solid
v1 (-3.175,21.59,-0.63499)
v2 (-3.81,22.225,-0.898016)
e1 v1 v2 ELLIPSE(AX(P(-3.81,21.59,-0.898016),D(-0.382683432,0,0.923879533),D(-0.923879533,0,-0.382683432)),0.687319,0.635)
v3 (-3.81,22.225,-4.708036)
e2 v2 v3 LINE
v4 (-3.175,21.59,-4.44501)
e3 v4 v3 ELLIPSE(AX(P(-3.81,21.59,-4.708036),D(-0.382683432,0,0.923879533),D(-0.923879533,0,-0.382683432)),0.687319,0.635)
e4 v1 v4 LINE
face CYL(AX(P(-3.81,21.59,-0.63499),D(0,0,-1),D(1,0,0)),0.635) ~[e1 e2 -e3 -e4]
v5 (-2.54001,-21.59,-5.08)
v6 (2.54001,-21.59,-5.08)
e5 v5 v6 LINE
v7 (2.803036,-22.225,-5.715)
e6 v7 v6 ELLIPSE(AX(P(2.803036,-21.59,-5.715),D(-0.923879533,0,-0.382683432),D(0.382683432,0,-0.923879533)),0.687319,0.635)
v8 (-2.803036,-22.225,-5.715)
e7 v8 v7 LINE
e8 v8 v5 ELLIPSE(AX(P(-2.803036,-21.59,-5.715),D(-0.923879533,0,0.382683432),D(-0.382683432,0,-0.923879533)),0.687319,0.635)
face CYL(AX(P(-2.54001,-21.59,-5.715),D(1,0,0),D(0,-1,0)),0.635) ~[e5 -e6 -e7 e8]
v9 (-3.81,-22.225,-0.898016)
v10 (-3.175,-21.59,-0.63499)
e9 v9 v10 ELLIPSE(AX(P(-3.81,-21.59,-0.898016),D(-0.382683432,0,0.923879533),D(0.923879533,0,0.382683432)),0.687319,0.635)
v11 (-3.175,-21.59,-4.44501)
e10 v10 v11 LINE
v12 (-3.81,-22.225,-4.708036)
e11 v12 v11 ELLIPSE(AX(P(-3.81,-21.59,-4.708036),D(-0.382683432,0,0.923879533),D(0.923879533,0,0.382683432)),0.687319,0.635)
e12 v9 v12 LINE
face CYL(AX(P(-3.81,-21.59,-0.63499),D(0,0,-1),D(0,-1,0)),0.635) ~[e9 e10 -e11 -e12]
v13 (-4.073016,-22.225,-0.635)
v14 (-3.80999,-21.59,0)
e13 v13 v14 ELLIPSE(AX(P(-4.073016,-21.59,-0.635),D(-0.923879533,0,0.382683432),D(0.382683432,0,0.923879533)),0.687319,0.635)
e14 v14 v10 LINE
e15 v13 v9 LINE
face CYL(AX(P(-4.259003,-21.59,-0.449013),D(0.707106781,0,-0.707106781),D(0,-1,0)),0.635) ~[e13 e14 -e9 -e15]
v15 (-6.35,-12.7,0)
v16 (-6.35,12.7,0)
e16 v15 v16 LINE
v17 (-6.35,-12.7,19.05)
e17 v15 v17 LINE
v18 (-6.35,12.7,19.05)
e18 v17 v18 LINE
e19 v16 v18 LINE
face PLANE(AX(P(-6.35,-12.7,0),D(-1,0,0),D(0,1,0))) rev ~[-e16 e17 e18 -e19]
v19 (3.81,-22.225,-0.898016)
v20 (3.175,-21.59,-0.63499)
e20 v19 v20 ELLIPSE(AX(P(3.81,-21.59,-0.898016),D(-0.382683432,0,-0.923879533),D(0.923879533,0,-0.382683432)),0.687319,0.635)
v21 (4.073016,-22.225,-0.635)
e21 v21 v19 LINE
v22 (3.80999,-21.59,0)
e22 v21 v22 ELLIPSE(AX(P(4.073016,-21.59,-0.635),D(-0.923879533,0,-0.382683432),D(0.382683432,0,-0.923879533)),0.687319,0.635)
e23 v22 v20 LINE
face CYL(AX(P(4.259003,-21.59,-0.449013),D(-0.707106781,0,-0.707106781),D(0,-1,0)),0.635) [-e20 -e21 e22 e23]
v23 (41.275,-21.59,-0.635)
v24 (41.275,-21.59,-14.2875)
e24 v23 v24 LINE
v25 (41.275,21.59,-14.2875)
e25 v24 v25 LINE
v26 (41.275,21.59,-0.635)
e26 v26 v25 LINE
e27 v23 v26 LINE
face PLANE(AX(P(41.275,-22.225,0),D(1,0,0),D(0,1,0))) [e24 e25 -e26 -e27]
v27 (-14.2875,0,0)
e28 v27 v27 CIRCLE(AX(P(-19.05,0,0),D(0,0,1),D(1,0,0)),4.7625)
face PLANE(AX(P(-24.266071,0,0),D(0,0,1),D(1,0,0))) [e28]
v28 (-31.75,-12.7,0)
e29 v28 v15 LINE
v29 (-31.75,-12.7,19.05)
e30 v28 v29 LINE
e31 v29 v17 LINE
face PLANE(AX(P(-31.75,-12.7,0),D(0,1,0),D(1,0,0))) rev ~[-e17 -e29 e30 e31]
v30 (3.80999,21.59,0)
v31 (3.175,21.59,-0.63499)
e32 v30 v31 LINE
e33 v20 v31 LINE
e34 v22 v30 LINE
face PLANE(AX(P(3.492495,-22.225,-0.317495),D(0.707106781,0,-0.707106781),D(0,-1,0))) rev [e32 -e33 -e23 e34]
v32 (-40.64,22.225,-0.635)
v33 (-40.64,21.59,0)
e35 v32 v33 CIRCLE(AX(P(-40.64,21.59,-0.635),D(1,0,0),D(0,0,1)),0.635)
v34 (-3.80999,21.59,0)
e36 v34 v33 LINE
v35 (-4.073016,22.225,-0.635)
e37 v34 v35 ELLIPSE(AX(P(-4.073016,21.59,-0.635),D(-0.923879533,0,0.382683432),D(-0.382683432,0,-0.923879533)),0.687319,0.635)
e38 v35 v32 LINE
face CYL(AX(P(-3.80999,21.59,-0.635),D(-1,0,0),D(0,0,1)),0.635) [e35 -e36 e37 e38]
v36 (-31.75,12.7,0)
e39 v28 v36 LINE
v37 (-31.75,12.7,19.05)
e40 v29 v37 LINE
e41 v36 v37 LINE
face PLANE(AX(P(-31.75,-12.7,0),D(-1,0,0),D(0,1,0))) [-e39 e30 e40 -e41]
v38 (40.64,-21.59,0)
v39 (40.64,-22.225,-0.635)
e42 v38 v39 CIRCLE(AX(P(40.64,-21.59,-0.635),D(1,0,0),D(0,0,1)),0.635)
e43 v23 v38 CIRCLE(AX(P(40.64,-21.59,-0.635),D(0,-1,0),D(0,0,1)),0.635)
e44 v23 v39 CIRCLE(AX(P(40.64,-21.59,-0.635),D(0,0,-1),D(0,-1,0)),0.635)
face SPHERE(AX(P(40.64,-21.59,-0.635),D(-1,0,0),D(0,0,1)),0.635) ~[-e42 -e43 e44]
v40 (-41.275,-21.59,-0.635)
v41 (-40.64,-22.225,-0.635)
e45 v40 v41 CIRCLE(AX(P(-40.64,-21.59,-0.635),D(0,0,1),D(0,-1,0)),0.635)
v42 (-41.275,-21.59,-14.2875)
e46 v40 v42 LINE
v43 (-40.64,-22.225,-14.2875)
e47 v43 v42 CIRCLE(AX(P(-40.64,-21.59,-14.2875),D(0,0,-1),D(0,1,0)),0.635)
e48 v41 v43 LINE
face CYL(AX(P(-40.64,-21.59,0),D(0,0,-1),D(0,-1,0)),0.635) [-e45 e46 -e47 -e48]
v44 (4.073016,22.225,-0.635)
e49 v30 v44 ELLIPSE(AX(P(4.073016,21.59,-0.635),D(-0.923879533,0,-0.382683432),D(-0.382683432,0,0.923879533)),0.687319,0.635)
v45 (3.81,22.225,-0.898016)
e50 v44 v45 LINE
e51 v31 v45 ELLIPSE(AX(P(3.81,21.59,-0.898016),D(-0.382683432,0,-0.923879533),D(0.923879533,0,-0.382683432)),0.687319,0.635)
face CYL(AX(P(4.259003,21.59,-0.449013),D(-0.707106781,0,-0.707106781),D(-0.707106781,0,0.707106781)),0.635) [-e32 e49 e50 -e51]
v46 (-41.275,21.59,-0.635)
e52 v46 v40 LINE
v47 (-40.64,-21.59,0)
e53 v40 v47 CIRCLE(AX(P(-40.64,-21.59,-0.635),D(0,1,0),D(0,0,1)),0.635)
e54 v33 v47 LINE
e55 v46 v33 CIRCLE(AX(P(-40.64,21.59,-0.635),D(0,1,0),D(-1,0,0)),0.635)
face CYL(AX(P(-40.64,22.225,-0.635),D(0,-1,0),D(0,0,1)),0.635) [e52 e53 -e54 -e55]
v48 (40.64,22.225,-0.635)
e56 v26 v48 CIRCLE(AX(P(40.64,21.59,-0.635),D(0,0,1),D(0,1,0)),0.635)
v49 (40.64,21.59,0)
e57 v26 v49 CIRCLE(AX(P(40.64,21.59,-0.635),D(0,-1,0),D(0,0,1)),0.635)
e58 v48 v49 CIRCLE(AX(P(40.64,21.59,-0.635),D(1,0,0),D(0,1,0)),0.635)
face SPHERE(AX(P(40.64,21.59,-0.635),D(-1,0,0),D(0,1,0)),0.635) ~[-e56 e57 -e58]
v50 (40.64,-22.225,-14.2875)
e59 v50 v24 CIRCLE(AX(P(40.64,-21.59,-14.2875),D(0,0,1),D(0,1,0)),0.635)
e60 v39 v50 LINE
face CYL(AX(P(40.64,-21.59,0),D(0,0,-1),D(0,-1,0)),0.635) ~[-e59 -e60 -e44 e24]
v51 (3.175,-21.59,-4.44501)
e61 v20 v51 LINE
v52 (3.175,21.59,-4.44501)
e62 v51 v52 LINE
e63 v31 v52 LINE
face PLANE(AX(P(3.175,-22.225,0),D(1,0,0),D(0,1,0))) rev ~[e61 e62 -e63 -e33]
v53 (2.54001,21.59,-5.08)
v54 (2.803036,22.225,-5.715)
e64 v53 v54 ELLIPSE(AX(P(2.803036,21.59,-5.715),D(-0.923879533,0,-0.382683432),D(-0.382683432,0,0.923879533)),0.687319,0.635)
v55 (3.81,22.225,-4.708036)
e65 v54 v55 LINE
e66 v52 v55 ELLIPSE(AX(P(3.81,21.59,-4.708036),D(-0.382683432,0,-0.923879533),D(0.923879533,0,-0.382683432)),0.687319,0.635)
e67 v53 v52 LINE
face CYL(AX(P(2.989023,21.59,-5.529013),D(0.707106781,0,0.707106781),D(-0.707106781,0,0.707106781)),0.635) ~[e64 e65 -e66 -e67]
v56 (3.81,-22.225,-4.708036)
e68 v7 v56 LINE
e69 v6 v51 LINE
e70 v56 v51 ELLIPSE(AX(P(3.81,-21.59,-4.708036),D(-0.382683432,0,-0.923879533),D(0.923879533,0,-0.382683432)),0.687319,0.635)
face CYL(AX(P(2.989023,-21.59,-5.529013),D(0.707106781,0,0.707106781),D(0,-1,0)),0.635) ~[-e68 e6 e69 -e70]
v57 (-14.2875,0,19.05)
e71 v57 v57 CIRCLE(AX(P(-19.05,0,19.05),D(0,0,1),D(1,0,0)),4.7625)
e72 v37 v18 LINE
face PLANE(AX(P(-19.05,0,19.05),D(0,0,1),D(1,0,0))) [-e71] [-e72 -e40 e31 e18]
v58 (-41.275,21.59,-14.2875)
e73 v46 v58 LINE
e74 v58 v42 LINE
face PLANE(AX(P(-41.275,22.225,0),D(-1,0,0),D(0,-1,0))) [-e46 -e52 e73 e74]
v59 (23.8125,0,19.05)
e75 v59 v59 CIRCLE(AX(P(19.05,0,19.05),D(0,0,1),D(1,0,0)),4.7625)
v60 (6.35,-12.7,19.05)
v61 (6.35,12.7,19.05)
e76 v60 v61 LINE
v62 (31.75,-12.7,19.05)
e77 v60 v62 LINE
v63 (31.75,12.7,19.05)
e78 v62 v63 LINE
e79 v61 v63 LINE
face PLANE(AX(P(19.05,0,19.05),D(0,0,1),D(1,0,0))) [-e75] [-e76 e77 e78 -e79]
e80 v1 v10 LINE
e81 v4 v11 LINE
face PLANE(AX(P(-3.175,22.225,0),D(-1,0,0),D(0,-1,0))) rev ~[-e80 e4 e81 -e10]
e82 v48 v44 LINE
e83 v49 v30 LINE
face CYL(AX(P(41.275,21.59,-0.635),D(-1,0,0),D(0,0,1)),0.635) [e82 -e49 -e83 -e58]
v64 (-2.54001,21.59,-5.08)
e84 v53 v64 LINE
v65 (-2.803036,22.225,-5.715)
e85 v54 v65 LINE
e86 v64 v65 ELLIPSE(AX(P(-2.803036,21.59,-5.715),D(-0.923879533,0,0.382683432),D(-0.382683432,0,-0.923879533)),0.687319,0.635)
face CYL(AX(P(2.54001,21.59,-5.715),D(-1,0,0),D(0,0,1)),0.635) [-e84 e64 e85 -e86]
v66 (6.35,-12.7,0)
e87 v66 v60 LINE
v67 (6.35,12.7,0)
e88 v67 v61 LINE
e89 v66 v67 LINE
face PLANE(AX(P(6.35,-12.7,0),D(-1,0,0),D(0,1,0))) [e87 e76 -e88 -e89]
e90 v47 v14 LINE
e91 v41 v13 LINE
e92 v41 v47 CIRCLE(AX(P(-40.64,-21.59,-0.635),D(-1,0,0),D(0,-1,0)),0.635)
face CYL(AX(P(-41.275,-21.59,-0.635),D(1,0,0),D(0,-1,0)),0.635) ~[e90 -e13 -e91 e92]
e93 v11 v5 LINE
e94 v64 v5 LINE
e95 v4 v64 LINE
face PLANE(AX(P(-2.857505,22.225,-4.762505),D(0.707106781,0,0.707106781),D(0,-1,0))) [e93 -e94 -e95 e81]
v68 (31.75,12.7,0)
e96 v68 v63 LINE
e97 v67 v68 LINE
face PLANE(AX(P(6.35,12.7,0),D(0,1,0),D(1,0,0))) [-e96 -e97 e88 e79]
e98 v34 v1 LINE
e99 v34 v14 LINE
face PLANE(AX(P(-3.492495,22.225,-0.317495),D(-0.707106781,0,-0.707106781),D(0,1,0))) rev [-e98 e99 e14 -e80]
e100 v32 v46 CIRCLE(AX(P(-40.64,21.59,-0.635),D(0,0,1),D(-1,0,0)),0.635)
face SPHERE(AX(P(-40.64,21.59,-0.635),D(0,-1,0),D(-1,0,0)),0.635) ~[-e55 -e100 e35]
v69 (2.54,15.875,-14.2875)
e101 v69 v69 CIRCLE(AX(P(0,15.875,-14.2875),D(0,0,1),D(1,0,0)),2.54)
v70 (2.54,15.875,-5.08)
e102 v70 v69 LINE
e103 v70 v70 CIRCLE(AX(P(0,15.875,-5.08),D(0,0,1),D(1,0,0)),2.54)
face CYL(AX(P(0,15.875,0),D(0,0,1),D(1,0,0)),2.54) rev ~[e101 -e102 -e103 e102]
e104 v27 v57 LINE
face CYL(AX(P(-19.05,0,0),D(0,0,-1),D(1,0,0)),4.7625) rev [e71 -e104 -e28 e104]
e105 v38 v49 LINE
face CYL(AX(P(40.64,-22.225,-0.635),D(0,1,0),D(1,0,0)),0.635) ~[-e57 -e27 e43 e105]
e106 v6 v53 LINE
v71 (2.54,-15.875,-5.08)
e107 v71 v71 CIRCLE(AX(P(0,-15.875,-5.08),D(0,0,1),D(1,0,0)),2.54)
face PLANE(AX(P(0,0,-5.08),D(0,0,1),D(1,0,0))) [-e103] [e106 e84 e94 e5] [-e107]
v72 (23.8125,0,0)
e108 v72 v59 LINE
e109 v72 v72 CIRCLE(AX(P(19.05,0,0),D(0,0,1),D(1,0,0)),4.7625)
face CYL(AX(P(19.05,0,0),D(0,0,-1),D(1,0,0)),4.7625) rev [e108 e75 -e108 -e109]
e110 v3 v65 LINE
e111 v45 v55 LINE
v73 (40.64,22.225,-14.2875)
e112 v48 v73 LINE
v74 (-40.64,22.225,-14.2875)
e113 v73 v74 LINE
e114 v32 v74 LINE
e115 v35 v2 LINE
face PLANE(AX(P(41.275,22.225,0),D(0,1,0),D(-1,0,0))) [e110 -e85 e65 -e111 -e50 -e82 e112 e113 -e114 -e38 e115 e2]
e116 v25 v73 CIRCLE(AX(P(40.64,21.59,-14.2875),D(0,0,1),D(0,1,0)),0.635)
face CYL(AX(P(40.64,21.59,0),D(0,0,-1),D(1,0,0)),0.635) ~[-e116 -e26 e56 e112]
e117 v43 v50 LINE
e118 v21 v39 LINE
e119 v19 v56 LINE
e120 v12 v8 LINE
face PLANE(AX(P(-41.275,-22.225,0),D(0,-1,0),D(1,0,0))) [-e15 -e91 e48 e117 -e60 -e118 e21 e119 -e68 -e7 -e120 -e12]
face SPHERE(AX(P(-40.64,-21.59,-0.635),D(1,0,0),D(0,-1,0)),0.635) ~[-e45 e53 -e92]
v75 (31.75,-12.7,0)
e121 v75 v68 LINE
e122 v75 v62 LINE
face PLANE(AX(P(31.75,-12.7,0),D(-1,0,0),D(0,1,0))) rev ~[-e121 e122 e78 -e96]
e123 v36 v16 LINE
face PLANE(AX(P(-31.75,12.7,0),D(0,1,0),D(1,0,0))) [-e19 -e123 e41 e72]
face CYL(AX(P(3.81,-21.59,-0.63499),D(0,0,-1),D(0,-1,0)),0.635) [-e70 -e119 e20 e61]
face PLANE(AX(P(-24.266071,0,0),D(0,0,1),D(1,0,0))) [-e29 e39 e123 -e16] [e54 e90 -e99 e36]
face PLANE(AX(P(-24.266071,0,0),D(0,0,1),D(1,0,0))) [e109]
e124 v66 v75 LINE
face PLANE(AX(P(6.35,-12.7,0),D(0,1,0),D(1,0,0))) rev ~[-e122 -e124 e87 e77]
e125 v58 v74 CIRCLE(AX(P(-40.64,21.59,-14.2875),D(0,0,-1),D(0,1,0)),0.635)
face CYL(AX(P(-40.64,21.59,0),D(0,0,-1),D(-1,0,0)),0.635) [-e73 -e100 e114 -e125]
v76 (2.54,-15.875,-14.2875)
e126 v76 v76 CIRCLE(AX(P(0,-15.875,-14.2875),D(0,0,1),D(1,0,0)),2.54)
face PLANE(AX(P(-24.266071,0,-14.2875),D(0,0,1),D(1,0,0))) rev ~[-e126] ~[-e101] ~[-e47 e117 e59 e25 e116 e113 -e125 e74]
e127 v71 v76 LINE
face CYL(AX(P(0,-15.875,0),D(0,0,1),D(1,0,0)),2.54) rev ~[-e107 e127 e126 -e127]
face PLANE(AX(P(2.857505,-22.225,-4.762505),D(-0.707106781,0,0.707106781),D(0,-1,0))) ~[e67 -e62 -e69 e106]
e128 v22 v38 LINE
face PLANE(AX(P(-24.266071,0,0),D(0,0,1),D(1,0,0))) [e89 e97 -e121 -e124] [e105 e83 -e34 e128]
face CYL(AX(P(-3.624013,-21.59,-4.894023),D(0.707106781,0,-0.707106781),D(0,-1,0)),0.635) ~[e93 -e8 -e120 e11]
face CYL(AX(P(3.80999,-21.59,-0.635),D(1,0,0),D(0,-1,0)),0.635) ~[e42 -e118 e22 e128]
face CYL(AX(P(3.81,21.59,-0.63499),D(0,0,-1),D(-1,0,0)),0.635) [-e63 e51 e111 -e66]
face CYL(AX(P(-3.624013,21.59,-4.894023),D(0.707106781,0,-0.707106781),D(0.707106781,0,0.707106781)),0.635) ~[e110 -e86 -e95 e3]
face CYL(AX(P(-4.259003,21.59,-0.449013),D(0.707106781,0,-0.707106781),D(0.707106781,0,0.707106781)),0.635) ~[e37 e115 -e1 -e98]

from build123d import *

# Parameters (mm, degrees)
F0_W     = 25.4
F0_H     = 25.4
F0_R     = 4.7625
F0_W_2   = 3.175
F0_W_3   = 6.35
F0_R_2   = 2.54
F1_DEPTH = 14.2875
F2_DEPTH = 19.05
F3_DEPTH = 5.08
F4_DEPTH = 14.2875
F5_SIZE  = 0.63499
F6_R     = 0.635


# Not quite as in the source:
# - a fillet or chamfer is up to 0.001 mm smaller than in the source, because OpenCascade refuses the exact size
# - a feature names something its author has since deleted; it is built from what else it names


with BuildPart() as f1:
    # F0 (on Top) → F1 (new body)
    with BuildSketch(Plane.XY):
        Polygon((-6.35, 12.7), (-3.175, 12.7), (-3.175, 22.225), (-41.275, 22.225), (-41.275, -22.225), (-3.175, -22.225), (-3.175, -12.7), (-6.35, -12.7), (-31.75, -12.7), (-31.75, 12.7), align=None)
        with Locations((-19.05, 0)):
            Rectangle(F0_W, F0_H)
        with Locations((-19.05, 0)):
            Circle(F0_R, mode=Mode.SUBTRACT)
        with Locations((-4.7625, 0)):
            Rectangle(F0_W_2, F0_H)
        Rectangle(F0_W_3, F0_H)
        Polygon((3.175, 12.7), (3.175, 22.225), (2.54, 22.225), (-2.54, 22.225), (-3.175, 22.225), (-3.175, 12.7), align=None)
        with Locations((0, 15.875)):
            Circle(F0_R_2, mode=Mode.SUBTRACT)
        Polygon((2.54, -22.225), (3.175, -22.225), (3.175, -12.7), (-3.175, -12.7), (-3.175, -22.225), (-2.54, -22.225), align=None)
        with Locations((0, -15.875)):
            Circle(F0_R_2, mode=Mode.SUBTRACT)
        Polygon((41.275, -22.225), (41.275, 22.225), (3.175, 22.225), (3.175, 12.7), (6.35, 12.7), (31.75, 12.7), (31.75, -12.7), (6.35, -12.7), (3.175, -12.7), (3.175, -22.225), align=None)
        with Locations((4.7625, 0)):
            Rectangle(F0_W_2, F0_H)
        with Locations((19.05, 0)):
            Rectangle(F0_W, F0_H)
        with Locations((19.05, 0)):
            Circle(F0_R, mode=Mode.SUBTRACT)
        with Locations((19.05, 0)):
            Circle(F0_R)
        with Locations((-19.05, 0)):
            Circle(F0_R)
    extrude(amount=-F1_DEPTH)

    # F0 (on Top) → F2 (join)
    with BuildSketch(Plane.XY):
        with Locations((-19.05, 0)):
            Rectangle(F0_W, F0_H)
        with Locations((-19.05, 0)):
            Circle(F0_R, mode=Mode.SUBTRACT)
        with Locations((19.05, 0)):
            Rectangle(F0_W, F0_H)
        with Locations((19.05, 0)):
            Circle(F0_R, mode=Mode.SUBTRACT)
    extrude(amount=F2_DEPTH)

    # F0 (on Top) → F3 (cut)
    with BuildSketch(Plane.XY):
        Rectangle(F0_W_3, F0_H)
        Polygon((2.54, -22.225), (3.175, -22.225), (3.175, -12.7), (-3.175, -12.7), (-3.175, -22.225), (-2.54, -22.225), align=None)
        with Locations((0, -15.875)):
            Circle(F0_R_2, mode=Mode.SUBTRACT)
        Polygon((3.175, 12.7), (3.175, 22.225), (2.54, 22.225), (-2.54, 22.225), (-3.175, 22.225), (-3.175, 12.7), align=None)
        with Locations((0, 15.875)):
            Circle(F0_R_2, mode=Mode.SUBTRACT)
    extrude(amount=-F3_DEPTH, mode=Mode.SUBTRACT)

    # F0 (on Top) → F4 (cut)
    with BuildSketch(Plane.XY):
        with Locations((0, -15.875)):
            Circle(F0_R_2)
        with Locations((0, 15.875)):
            Circle(F0_R_2)
    extrude(amount=-F4_DEPTH, mode=Mode.SUBTRACT)

    # F5 (size 0.635 in the source; OpenCascade refuses exactly that, so slightly less here)
    f5_edges = [f1.edges().sort_by_distance(p)[0] for p in [
        (3.175, 0, -5.08),
        (-3.175, 0, -5.08),
        (3.175, 0, 0),
        (-3.175, 0, 0),
    ]]
    chamfer(f5_edges, length=F5_SIZE)

    # F6
    f6_edges = [f1.edges().sort_by_distance(p)[0] for p in [
        (-22.542495, -22.225, 0),
        (-3.492495, -22.225, -0.317495),
        (-2.857505, -22.225, -4.762505),
        (0, -22.225, -5.08),
        (2.857505, -22.225, -4.762505),
        (3.175, -22.225, -2.54),
        (3.492495, -22.225, -0.317495),
        (22.542495, -22.225, 0),
        (-41.275, -22.225, -7.14375),
        (-41.275, 0, 0),
        (-41.275, 22.225, -7.14375),
        (-22.542495, 22.225, 0),
        (-3.175, 22.225, -2.54),
        (-3.492495, 22.225, -0.317495),
        (0, 22.225, -5.08),
        (-2.857505, 22.225, -4.762505),
        (22.542495, 22.225, 0),
        (3.175, 22.225, -2.54),
        (3.492495, 22.225, -0.317495),
        (41.275, 22.225, -7.14375),
        (41.275, 0, 0),
        (41.275, -22.225, -7.14375),
        (2.857505, 22.225, -4.762505),
        (-3.175, -22.225, -2.54),
    ]]
    fillet(f6_edges, radius=F6_R)


solid = f1.part
